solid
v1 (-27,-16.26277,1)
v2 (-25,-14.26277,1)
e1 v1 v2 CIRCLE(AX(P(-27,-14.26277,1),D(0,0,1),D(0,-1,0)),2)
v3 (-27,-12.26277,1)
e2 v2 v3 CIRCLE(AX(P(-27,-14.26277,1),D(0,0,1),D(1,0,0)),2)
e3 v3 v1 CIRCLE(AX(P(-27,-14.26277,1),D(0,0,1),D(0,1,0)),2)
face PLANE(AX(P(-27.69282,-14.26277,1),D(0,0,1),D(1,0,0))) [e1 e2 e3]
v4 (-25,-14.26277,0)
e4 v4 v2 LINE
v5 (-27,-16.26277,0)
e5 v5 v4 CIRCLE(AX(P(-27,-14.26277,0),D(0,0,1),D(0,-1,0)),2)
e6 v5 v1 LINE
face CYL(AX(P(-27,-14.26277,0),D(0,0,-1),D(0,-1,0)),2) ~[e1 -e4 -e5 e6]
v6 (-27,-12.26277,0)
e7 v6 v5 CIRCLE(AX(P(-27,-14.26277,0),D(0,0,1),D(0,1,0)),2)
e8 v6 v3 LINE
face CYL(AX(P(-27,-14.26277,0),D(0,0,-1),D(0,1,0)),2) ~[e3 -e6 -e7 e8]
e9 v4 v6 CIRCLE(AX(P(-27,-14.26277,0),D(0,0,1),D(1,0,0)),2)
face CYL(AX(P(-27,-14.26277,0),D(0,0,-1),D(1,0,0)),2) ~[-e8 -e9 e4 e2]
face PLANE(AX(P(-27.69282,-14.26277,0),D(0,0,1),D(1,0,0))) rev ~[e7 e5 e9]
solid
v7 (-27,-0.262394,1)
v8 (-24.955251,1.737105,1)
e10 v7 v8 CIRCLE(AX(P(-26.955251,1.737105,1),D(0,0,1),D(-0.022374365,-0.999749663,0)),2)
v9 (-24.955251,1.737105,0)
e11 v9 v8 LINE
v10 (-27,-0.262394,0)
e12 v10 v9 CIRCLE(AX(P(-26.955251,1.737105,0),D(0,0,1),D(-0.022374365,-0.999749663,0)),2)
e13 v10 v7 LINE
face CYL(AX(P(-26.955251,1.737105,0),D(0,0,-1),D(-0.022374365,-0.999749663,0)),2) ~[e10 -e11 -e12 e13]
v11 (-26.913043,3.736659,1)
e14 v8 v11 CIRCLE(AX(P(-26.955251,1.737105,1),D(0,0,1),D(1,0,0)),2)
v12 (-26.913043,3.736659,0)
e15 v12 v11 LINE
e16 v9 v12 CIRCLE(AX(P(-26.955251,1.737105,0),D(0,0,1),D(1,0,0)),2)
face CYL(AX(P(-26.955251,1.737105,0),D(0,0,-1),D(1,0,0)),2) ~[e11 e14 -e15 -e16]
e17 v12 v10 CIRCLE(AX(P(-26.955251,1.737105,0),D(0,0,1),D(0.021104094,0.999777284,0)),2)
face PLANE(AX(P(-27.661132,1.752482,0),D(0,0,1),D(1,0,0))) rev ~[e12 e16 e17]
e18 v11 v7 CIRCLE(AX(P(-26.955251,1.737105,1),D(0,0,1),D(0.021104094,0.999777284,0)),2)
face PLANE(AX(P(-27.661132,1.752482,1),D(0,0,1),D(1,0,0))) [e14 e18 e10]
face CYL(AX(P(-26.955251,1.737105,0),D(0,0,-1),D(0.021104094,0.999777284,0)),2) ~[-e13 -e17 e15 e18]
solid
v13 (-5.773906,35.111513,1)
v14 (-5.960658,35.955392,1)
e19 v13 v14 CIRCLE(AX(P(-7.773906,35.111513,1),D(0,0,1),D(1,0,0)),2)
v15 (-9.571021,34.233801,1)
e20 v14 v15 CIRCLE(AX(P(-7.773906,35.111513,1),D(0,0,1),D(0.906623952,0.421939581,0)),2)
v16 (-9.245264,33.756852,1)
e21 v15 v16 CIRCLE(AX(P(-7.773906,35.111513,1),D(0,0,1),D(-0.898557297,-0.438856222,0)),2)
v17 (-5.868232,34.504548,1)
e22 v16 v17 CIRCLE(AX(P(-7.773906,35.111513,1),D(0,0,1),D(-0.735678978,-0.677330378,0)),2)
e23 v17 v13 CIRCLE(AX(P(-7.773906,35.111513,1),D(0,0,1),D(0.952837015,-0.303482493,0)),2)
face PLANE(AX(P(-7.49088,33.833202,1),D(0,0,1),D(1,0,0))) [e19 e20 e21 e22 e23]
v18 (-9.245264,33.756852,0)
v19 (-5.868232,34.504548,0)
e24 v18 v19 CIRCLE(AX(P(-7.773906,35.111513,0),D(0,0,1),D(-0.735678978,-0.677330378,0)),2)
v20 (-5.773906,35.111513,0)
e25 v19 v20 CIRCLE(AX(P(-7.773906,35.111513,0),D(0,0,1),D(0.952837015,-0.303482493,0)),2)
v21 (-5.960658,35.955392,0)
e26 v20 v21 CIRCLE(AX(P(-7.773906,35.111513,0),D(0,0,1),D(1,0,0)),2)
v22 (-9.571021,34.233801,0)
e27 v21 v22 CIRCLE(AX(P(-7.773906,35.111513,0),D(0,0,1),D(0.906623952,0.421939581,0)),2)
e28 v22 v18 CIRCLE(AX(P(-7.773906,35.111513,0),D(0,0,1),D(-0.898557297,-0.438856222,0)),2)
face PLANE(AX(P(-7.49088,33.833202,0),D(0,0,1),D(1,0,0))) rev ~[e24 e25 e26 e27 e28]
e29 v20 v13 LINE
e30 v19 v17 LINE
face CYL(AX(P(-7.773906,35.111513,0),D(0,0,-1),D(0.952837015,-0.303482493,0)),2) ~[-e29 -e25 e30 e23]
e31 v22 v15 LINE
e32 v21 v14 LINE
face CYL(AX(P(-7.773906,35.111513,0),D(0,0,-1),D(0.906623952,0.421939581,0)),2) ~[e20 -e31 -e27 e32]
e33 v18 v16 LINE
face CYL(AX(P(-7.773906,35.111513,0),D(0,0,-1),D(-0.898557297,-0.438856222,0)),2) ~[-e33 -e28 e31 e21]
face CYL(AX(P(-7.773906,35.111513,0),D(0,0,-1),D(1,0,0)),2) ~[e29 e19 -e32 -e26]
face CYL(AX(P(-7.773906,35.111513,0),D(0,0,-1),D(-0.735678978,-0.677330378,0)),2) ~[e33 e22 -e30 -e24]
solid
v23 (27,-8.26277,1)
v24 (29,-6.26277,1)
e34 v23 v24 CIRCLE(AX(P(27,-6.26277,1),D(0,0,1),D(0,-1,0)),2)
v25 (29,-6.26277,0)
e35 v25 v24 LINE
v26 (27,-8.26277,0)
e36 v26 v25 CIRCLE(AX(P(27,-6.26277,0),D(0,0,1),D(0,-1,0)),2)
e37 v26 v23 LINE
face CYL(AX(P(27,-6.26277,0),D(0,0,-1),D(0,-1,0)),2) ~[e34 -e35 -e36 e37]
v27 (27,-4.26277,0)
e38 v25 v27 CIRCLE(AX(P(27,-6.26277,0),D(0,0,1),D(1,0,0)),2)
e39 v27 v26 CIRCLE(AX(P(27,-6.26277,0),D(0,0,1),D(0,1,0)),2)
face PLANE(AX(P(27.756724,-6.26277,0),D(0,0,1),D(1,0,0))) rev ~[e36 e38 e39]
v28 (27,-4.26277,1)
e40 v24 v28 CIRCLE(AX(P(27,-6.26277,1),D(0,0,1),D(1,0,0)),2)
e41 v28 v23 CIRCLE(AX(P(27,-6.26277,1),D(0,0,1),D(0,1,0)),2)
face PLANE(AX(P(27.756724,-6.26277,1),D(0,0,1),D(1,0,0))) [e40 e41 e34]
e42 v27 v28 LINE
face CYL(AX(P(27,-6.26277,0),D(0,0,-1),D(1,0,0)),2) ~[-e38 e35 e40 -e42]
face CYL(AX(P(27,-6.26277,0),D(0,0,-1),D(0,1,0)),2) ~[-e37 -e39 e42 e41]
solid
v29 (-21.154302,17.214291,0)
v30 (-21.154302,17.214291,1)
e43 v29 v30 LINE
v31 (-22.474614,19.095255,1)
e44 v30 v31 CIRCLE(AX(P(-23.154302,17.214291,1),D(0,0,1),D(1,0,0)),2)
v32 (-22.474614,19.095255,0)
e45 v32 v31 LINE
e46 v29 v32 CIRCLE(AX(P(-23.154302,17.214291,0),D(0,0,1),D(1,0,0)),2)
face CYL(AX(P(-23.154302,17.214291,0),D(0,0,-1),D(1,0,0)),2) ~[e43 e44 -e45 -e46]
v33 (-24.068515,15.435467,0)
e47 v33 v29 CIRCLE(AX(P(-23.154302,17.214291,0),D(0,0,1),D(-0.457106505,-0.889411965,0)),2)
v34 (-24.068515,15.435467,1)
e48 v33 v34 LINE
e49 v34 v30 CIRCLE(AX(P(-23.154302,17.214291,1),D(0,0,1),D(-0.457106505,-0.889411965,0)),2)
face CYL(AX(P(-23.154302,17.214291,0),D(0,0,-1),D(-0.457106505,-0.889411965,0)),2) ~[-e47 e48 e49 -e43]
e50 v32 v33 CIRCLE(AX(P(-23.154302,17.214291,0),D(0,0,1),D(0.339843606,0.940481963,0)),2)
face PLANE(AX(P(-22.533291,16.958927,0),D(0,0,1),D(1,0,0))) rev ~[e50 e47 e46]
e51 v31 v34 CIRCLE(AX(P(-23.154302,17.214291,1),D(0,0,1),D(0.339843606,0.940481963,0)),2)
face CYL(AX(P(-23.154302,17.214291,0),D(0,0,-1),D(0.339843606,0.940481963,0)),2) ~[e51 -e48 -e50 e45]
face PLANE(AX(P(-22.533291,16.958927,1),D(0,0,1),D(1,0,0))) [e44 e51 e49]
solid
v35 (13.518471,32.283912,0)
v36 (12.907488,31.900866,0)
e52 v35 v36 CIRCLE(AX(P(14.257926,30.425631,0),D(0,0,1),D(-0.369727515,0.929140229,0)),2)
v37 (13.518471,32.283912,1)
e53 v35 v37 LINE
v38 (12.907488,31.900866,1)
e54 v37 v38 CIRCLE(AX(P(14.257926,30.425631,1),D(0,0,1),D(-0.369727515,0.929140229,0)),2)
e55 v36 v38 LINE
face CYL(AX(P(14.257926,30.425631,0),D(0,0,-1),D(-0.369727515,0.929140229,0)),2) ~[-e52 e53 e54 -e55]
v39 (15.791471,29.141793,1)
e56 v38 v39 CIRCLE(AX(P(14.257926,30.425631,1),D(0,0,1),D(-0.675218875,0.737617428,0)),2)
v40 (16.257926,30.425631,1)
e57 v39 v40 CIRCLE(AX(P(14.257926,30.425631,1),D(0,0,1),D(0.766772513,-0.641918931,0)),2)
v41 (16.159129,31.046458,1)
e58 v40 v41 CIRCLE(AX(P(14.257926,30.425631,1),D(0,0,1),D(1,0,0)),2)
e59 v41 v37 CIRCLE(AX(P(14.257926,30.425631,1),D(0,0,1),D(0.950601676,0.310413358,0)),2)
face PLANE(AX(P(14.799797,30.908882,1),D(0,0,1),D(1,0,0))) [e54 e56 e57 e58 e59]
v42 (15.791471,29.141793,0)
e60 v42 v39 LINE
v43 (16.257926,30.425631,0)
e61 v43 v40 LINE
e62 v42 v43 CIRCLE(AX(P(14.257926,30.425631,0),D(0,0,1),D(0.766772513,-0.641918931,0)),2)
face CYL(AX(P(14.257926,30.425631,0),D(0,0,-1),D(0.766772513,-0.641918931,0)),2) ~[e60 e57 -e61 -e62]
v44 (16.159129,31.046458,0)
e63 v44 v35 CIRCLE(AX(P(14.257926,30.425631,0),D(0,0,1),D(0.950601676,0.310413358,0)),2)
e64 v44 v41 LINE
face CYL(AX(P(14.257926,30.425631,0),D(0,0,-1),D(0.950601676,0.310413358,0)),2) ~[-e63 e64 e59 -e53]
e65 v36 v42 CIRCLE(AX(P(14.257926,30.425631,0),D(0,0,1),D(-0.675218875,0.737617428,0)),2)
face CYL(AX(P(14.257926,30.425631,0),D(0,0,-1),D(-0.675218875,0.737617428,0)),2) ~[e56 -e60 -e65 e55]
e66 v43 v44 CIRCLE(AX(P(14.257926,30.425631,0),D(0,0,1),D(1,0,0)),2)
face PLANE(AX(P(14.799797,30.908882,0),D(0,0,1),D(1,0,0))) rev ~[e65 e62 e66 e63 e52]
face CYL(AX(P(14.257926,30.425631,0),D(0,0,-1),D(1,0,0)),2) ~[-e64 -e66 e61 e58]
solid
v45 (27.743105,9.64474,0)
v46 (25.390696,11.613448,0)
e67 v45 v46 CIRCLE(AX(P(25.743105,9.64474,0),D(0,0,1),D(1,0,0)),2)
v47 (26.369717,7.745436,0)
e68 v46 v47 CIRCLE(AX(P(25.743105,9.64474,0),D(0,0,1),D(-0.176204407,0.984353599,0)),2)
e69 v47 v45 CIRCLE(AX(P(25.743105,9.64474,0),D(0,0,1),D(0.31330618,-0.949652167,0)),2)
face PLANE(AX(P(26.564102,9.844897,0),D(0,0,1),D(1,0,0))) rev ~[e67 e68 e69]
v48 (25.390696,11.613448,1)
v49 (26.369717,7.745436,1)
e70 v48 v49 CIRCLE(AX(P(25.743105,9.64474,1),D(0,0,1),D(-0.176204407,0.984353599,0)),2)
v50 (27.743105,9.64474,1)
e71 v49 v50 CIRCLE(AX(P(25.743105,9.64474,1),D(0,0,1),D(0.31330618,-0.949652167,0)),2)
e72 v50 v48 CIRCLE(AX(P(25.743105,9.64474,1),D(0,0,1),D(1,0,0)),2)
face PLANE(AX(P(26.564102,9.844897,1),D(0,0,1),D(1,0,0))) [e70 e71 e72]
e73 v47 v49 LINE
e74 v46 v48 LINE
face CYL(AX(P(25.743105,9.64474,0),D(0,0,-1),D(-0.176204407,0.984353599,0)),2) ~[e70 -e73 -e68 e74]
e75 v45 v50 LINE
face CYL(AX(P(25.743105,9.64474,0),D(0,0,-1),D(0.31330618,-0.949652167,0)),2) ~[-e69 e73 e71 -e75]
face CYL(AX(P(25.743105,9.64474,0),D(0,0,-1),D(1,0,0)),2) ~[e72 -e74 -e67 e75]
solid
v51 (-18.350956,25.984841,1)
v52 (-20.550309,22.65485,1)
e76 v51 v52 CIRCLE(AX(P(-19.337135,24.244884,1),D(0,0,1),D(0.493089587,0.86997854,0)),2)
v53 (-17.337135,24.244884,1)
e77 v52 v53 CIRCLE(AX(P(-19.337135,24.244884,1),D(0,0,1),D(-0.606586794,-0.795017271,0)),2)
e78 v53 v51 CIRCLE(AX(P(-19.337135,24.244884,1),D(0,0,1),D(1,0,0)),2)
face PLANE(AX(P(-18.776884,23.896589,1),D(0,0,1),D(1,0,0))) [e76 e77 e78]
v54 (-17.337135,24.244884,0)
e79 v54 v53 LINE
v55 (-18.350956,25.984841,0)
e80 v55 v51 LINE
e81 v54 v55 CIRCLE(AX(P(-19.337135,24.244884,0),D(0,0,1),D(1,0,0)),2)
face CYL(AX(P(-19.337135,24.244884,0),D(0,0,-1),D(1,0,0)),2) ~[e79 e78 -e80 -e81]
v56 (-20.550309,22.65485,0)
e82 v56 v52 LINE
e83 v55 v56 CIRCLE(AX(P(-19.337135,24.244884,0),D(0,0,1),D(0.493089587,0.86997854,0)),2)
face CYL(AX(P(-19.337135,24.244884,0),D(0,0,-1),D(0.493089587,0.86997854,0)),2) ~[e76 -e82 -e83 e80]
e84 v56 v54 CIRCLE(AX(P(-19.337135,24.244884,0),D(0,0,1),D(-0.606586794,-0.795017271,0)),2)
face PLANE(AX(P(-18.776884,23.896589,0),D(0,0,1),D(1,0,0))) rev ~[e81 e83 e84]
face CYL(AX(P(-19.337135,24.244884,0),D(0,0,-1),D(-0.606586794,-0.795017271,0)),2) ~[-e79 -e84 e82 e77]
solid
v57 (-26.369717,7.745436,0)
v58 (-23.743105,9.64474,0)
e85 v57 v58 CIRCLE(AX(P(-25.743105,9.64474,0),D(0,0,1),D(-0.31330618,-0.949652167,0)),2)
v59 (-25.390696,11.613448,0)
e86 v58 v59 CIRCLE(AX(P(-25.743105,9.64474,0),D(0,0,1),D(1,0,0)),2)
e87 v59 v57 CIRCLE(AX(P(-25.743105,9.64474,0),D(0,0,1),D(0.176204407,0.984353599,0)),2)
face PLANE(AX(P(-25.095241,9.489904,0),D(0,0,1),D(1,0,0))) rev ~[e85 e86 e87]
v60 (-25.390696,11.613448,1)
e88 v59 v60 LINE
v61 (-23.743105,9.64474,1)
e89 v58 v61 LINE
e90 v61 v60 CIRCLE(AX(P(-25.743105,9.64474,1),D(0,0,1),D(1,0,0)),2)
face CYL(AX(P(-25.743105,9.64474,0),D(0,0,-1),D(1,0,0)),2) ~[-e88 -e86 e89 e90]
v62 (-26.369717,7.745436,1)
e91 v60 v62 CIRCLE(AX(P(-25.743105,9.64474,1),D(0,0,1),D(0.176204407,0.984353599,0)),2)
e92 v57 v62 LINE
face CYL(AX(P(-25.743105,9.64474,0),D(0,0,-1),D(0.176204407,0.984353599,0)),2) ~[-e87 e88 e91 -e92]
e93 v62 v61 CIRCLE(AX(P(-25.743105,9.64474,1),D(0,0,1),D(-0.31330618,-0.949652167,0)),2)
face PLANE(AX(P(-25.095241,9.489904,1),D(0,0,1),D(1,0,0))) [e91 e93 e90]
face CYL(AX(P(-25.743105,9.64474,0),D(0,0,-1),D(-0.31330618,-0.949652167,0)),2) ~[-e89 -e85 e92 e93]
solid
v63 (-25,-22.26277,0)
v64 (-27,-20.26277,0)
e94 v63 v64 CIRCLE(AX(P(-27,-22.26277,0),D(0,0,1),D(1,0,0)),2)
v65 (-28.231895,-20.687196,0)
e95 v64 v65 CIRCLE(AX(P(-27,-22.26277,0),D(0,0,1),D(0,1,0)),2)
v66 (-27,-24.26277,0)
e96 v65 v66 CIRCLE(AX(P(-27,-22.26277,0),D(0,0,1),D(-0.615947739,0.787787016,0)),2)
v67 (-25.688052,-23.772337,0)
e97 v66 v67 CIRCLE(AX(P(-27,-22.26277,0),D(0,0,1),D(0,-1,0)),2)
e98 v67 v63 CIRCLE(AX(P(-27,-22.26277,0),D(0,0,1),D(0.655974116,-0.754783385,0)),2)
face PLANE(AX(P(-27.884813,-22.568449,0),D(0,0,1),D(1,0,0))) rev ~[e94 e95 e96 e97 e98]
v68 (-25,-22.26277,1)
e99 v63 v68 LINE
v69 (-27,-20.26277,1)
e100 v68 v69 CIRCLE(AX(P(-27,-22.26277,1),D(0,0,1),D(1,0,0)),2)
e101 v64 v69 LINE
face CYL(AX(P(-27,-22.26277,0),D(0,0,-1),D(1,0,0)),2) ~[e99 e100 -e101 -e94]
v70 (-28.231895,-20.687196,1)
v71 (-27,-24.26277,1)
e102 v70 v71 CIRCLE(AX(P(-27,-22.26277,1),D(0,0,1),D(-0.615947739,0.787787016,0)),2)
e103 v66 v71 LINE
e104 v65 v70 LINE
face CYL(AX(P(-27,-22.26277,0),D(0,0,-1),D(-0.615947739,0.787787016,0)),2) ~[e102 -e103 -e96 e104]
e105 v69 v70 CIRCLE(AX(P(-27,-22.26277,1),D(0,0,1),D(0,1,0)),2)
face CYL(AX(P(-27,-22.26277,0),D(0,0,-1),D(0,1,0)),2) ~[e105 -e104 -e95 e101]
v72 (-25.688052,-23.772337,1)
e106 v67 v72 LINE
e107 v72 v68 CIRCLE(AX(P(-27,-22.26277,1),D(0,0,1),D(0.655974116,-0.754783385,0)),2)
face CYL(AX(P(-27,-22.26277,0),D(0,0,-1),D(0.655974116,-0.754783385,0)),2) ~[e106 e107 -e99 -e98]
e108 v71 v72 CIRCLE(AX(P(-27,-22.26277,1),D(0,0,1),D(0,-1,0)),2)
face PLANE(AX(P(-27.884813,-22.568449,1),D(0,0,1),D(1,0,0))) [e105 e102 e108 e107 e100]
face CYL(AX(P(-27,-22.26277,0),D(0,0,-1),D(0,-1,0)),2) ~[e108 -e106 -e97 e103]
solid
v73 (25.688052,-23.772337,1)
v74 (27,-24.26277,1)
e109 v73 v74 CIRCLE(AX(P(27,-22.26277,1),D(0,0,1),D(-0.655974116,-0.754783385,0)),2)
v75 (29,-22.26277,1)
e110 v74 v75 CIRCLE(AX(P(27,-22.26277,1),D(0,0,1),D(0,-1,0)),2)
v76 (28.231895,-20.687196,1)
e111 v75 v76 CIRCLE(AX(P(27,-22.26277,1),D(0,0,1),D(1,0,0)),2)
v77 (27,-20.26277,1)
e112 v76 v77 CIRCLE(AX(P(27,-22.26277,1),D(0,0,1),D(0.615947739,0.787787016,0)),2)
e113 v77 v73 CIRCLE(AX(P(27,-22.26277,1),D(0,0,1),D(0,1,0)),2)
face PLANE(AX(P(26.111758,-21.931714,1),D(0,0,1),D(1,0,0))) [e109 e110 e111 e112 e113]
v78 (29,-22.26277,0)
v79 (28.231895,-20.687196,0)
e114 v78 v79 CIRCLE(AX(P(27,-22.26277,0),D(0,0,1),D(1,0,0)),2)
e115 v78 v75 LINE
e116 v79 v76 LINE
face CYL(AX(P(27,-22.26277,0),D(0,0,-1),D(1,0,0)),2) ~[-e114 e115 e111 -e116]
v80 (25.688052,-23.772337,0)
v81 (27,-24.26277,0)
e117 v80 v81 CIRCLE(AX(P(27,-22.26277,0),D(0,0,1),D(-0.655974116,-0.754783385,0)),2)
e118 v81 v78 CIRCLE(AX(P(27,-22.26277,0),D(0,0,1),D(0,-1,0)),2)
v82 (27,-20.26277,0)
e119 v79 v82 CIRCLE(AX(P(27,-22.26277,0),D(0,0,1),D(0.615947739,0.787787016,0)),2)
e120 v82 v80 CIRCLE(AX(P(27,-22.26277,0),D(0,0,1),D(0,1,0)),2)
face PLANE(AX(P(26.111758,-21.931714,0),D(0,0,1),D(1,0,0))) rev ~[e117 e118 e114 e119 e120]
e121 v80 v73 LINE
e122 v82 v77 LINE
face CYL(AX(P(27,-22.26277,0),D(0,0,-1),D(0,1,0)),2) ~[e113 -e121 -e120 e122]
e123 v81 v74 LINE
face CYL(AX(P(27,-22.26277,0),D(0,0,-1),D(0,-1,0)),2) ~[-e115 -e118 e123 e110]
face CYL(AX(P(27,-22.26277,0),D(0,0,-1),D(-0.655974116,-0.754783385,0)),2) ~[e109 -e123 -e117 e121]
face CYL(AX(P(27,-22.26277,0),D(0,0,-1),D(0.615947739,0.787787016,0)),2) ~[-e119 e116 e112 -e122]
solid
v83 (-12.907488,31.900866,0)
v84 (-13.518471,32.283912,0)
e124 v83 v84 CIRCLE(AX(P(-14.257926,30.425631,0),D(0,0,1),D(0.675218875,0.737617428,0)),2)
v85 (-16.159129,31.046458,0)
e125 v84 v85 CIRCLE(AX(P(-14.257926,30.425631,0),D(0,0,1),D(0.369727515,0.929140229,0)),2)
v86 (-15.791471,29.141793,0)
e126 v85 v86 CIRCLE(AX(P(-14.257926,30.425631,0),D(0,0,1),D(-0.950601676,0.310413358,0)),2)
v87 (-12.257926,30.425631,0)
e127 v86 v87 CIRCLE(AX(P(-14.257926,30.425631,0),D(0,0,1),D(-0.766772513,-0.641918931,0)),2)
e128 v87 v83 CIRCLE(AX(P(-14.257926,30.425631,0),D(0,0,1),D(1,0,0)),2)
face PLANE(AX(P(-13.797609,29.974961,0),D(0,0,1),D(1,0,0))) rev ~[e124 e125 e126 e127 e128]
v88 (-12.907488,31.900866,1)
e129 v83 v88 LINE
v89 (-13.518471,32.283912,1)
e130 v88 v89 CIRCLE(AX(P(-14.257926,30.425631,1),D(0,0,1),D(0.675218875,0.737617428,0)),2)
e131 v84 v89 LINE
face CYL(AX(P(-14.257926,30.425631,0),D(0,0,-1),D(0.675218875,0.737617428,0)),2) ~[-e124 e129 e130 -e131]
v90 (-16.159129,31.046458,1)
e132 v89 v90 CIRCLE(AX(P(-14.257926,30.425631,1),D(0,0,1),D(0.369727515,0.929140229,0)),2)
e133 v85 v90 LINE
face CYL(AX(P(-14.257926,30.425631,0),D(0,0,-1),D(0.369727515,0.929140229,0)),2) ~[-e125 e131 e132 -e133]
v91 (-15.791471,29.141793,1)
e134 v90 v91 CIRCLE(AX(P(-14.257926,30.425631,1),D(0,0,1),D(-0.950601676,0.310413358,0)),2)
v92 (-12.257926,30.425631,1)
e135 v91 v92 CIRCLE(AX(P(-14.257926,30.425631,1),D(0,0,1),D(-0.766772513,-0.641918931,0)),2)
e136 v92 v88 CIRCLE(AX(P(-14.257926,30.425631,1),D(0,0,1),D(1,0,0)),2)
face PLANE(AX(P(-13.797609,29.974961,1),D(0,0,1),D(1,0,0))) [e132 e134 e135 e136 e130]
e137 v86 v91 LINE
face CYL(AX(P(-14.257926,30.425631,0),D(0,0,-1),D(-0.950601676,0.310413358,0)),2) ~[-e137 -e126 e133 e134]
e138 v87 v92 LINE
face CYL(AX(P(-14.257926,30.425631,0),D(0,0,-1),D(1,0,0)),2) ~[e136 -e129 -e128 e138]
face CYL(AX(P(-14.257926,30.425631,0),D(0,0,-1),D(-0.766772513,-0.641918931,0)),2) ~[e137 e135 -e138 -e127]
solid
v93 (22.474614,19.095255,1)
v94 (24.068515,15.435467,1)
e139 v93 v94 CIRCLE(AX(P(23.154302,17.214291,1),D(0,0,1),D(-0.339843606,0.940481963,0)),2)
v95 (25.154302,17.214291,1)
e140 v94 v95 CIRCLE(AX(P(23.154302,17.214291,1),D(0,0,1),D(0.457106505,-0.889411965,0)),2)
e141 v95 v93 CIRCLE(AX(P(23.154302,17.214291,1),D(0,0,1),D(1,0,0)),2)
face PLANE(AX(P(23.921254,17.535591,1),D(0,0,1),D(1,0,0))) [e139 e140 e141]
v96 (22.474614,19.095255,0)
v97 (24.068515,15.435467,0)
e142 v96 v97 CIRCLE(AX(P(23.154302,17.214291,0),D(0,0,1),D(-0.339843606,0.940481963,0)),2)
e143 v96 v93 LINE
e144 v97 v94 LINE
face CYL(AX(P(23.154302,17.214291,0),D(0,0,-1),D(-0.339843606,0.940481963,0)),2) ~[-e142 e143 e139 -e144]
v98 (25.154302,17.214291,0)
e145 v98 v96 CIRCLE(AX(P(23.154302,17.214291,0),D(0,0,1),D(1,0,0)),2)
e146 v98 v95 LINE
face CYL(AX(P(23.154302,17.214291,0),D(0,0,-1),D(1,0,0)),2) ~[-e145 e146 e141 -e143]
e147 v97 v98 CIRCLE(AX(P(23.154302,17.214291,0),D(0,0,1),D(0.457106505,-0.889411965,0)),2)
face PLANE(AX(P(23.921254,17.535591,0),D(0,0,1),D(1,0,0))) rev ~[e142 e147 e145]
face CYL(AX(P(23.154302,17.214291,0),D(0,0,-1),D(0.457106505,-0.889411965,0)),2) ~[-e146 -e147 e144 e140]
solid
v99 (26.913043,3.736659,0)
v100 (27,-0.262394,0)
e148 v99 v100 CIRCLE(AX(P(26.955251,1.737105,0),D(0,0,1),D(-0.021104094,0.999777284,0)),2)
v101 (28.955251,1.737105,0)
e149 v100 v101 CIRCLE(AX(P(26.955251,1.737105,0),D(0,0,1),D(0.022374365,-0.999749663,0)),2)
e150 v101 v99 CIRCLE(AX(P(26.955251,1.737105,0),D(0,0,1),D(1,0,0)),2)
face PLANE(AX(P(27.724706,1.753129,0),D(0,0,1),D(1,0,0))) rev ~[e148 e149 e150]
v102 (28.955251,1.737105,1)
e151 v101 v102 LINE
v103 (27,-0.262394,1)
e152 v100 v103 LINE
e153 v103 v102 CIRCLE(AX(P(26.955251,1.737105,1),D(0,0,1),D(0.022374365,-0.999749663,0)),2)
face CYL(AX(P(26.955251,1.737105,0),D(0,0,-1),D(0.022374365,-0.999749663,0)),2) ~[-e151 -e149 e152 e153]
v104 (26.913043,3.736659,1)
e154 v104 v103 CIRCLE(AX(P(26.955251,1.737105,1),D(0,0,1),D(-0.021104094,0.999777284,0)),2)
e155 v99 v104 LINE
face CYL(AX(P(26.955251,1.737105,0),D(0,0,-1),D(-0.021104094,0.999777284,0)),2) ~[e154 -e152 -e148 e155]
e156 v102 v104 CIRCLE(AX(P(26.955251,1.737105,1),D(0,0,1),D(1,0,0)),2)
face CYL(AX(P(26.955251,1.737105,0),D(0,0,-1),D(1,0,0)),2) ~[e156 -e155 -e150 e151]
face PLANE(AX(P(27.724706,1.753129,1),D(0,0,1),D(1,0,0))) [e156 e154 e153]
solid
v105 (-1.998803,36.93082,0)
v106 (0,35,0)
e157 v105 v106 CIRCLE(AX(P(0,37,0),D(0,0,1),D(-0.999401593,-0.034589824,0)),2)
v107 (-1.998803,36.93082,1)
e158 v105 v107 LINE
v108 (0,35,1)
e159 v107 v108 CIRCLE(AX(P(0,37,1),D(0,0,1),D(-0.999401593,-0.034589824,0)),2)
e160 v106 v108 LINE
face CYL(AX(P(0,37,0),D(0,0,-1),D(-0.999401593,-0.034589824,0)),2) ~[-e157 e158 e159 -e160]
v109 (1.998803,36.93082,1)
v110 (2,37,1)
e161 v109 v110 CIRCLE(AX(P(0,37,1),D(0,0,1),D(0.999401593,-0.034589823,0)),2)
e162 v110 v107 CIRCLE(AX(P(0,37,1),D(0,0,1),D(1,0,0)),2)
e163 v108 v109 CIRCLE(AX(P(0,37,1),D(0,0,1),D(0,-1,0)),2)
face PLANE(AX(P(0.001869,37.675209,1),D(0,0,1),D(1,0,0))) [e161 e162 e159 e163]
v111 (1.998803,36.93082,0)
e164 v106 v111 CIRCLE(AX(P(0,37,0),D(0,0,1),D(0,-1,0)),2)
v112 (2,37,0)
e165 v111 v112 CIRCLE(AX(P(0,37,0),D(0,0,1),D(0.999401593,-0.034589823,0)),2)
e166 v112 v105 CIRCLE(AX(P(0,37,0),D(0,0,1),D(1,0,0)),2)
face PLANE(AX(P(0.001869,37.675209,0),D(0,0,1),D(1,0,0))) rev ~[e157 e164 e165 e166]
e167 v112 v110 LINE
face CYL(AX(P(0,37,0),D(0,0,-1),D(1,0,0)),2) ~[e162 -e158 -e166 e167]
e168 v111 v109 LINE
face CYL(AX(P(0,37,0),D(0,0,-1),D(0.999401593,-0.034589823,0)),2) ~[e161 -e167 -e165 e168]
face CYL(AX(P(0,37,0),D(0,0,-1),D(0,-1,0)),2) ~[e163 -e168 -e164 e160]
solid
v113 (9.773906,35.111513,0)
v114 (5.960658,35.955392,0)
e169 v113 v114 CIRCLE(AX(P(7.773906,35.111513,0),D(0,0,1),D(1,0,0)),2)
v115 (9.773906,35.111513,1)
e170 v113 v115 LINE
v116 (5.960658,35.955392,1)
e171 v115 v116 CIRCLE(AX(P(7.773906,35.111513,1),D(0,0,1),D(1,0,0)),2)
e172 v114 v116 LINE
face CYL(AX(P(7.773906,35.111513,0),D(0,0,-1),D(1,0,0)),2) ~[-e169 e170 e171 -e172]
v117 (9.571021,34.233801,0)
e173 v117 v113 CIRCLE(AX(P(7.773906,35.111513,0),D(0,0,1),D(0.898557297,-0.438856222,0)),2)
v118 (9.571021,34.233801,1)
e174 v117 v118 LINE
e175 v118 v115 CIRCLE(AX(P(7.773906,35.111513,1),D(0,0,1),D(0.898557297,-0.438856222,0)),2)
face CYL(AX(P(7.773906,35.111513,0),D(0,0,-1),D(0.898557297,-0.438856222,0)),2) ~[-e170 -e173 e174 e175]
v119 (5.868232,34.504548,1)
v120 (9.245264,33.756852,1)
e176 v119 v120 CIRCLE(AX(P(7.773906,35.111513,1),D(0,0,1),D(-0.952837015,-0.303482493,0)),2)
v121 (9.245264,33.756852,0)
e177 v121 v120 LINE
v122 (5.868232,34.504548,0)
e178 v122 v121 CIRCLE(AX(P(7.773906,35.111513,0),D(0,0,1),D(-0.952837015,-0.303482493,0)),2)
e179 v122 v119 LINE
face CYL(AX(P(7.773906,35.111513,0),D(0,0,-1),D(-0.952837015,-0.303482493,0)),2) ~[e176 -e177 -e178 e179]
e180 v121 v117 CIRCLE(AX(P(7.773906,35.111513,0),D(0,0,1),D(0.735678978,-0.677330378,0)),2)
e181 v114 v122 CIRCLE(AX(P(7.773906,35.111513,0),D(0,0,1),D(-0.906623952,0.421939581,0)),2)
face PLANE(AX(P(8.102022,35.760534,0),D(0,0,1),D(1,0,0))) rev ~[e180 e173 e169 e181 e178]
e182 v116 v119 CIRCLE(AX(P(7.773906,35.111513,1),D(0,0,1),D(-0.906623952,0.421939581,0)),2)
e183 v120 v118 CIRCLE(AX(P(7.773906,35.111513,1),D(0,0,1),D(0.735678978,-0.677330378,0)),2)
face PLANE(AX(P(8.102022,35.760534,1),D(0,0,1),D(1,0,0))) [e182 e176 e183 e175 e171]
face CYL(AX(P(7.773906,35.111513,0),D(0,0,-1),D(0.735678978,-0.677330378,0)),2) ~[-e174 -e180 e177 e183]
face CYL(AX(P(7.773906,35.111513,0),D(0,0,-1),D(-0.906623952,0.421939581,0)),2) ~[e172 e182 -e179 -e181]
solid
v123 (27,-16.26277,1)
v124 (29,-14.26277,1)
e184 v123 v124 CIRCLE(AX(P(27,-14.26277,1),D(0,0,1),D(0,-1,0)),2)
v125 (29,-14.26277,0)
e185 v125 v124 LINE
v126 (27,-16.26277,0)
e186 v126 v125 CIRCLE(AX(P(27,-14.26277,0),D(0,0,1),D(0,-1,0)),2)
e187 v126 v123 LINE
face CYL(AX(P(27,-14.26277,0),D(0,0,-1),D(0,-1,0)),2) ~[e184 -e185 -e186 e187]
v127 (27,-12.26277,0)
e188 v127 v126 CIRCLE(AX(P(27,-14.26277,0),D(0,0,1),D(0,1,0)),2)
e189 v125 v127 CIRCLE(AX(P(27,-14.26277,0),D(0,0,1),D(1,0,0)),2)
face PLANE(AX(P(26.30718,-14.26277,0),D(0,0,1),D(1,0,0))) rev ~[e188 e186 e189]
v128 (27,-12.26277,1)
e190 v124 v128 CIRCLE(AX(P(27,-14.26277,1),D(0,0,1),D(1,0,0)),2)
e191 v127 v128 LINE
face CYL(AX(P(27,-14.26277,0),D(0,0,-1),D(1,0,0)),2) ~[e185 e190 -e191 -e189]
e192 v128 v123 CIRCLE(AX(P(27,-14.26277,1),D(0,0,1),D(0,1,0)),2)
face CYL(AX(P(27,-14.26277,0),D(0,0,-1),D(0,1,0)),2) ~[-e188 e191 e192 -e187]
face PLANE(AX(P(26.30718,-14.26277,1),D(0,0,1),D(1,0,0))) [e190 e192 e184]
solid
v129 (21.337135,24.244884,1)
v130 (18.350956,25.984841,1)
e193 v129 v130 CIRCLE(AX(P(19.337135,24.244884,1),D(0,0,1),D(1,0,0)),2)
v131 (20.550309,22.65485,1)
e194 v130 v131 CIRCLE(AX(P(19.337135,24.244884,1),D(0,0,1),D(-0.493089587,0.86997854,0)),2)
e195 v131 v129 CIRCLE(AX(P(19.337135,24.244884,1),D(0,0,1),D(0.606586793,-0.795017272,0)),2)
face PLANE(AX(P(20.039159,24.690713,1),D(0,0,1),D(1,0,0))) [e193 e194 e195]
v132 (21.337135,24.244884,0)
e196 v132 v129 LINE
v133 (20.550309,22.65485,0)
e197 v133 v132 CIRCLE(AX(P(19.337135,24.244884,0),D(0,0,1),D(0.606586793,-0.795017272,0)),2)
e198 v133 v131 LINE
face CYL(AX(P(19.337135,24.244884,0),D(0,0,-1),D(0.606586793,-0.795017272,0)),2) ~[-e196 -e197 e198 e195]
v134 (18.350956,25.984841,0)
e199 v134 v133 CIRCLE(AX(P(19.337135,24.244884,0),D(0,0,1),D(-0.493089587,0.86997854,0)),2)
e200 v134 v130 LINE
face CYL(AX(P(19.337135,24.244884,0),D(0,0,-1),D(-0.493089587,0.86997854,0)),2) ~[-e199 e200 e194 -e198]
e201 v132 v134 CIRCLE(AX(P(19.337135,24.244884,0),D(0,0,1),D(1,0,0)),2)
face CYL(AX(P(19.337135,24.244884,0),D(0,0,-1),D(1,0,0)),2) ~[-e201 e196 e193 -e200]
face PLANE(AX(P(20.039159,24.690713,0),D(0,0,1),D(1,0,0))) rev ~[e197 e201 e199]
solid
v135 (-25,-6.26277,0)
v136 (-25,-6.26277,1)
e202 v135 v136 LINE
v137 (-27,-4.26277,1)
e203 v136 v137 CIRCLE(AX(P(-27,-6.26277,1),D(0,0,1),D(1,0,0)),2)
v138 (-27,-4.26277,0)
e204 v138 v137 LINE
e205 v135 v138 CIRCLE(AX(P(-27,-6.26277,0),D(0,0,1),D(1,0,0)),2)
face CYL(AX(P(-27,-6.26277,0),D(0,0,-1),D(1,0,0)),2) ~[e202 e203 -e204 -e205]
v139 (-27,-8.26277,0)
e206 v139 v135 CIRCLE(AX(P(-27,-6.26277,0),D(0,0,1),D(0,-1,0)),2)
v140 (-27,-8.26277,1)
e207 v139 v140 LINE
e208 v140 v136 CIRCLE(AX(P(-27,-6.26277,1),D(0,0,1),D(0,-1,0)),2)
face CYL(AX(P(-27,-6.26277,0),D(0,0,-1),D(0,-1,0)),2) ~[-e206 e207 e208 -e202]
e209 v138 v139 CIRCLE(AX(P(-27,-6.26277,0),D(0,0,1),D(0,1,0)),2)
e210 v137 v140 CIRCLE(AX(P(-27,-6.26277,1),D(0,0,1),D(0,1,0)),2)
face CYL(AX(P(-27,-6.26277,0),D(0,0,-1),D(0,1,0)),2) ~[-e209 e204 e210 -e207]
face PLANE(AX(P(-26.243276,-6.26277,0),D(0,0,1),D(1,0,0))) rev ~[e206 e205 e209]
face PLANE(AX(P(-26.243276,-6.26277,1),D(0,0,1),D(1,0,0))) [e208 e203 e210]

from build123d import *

# Parameters (mm, degrees)
F1_DEPTH = 1


with BuildPart() as f1:
    # F0 (on Top) → F1 (new body)
    with BuildSketch(Plane.XY):
        with BuildLine():
            ThreePointArc((-27, -22.2710574513), (-27.6273003349, -21.4879565386), (-28.2318954775, -20.6871959856))
            ThreePointArc((-28.2318954775, -20.6871959856), (-28.8909188329, -22.914249847), (-27, -24.2627700182))
            Line((-27, -24.2627700182), (-27, -22.2710574513))
        make_face()
        with BuildLine():
            ThreePointArc((-27, -24.2627700182), (-26.2996906188, -24.1361537938), (-25.6880517673, -23.7723367888))
            ThreePointArc((-25.6880517673, -23.7723367888), (-26.3547179775, -23.0310407999), (-27, -22.2710574513))
            Line((-27, -22.2710574513), (-27, -24.2627700182))
        make_face()
        with BuildLine():
            ThreePointArc((-27, -22.2710574513), (-26.3547179775, -23.0310407999), (-25.6880517673, -23.7723367888))
            ThreePointArc((-25.6880517673, -23.7723367888), (-25.1801241161, -23.0922588773), (-25, -22.2627700182))
            ThreePointArc((-25, -22.2627700182), (-25.5857864376, -20.8485564558), (-27, -20.2627700182))
            Line((-27, -20.2627700182), (-27, -22.2710574513))
        make_face()
        with BuildLine():
            ThreePointArc((-27, -20.2627700182), (-27.6514798288, -20.3718511853), (-28.2318954775, -20.6871959856))
            ThreePointArc((-28.2318954775, -20.6871959856), (-27.6273003349, -21.4879565386), (-27, -22.2710574513))
            Line((-27, -22.2710574513), (-27, -20.2627700182))
        make_face()
    extrude(amount=F1_DEPTH)


with BuildPart() as f1b:
    # F0 (on Top) → F1, piece 2 (new body)
    with BuildSketch(Plane.XY):
        with BuildLine():
            ThreePointArc((-27, -12.2627700182), (-29, -14.2627700182), (-27, -16.2627700182))
            Line((-27, -16.2627700182), (-27, -12.2627700182))
        make_face()
        with BuildLine():
            Line((-27, -12.2627700182), (-27, -16.2627700182))
            ThreePointArc((-27, -16.2627700182), (-25.5857864376, -15.6769835806), (-25, -14.2627700182))
            ThreePointArc((-25, -14.2627700182), (-25.5857864376, -12.8485564558), (-27, -12.2627700182))
        make_face()
    extrude(amount=F1_DEPTH)


with BuildPart() as f1c:
    # F0 (on Top) → F1, piece 3 (new body)
    with BuildSketch(Plane.XY):
        with BuildLine():
            Line((-27, -4.2627700182), (-27, -8.2627700182))
            ThreePointArc((-27, -8.2627700182), (-25.5857864376, -7.6769835806), (-25, -6.2627700182))
            ThreePointArc((-25, -6.2627700182), (-25.5857864376, -4.8485564558), (-27, -4.2627700182))
        make_face()
        with BuildLine():
            ThreePointArc((-27, -4.2627700182), (-29, -6.2627700182), (-27, -8.2627700182))
            Line((-27, -8.2627700182), (-27, -4.2627700182))
        make_face()
    extrude(amount=F1_DEPTH)


with BuildPart() as f1d:
    # F0 (on Top) → F1, piece 4 (new body)
    with BuildSketch(Plane.XY):
        with BuildLine():
            ThreePointArc((-26.9130430815, 3.7366593954), (-28.9547786194, 1.7805832958), (-27, -0.2623944974))
            Line((-27, -0.2623944974), (-27, 2.1762e-06))
            add(Edge.make_bspline(
                [(-26.9130430815, 3.7366593954), (-26.9557223388, 3.1632457962), (-27.0178727185, 1.9174252072), (-27.018694794, 0.6711028041), (-27, 2.1762e-06)],
                knots=[46.3026951197, 46.3026951197, 46.3026951197, 46.3026951197, 48.0262708445, 50.0404462243, 50.0404462243, 50.0404462243, 50.0404462243], degree=3))
        make_face()
        with BuildLine():
            Line((-27, 2.1762e-06), (-27, -0.2623944974))
            ThreePointArc((-27, -0.2623944974), (-25.5569482732, 0.3071577202), (-24.9552512695, 1.7371048277))
            ThreePointArc((-24.9552512695, 1.7371048277), (-25.5261927725, 3.1363159669), (-26.9130430815, 3.7366593954))
            add(Edge.make_bspline(
                [(-26.9130430815, 3.7366593954), (-26.9557223388, 3.1632457962), (-27.0178727185, 1.9174252072), (-27.018694794, 0.6711028041), (-27, 2.1762e-06)],
                knots=[46.3026951197, 46.3026951197, 46.3026951197, 46.3026951197, 48.0262708445, 50.0404462243, 50.0404462243, 50.0404462243, 50.0404462243], degree=3))
        make_face()
    extrude(amount=F1_DEPTH)


with BuildPart() as f1e:
    # F0 (on Top) → F1, piece 5 (new body)
    with BuildSketch(Plane.XY):
        with BuildLine():
            ThreePointArc((-23.7431047524, 9.6447404302), (-24.2093483136, 10.9283257161), (-25.3906959388, 11.6134476273))
            add(Edge.make_bspline(
                [(-25.3906959388, 11.6134476273), (-25.7772926058, 10.3391469136), (-26.1108947944, 9.0492772718), (-26.3697171129, 7.7454360971)],
                knots=[38.2700182558, 38.2700182558, 38.2700182558, 38.2700182558, 42.2565390205, 42.2565390205, 42.2565390205, 42.2565390205], degree=3))
            ThreePointArc((-26.3697171129, 7.7454360971), (-24.571188527, 8.0240577467), (-23.7431047524, 9.6447404302))
        make_face()
        with BuildLine():
            add(Edge.make_bspline(
                [(-25.3906959388, 11.6134476273), (-25.7772926058, 10.3391469136), (-26.1108947944, 9.0492772718), (-26.3697171129, 7.7454360971)],
                knots=[38.2700182558, 38.2700182558, 38.2700182558, 38.2700182558, 42.2565390205, 42.2565390205, 42.2565390205, 42.2565390205], degree=3))
            ThreePointArc((-25.3906959388, 11.6134476273), (-27.6819640036, 10.135479469), (-26.3697171129, 7.7454360971))
        make_face()
    extrude(amount=F1_DEPTH)


with BuildPart() as f1f:
    # F0 (on Top) → F1, piece 6 (new body)
    with BuildSketch(Plane.XY):
        with BuildLine():
            ThreePointArc((-21.1543015859, 17.2142911543), (-21.5173265672, 18.3633397991), (-22.4746143741, 19.0952550811))
            add(Edge.make_bspline(
                [(-22.4746143741, 19.0952550811), (-23.0556600273, 17.8981688231), (-23.5857836353, 16.6765500861), (-24.0685145965, 15.4354672251)],
                knots=[30.2406883205, 30.2406883205, 30.2406883205, 30.2406883205, 34.2317341084, 34.2317341084, 34.2317341084, 34.2317341084], degree=3))
            ThreePointArc((-24.0685145965, 15.4354672251), (-22.1122905546, 15.5071845347), (-21.1543015859, 17.2142911543))
        make_face()
        with BuildLine():
            add(Edge.make_bspline(
                [(-22.4746143741, 19.0952550811), (-23.0556600273, 17.8981688231), (-23.5857836353, 16.6765500861), (-24.0685145965, 15.4354672251)],
                knots=[30.2406883205, 30.2406883205, 30.2406883205, 30.2406883205, 34.2317341084, 34.2317341084, 34.2317341084, 34.2317341084], degree=3))
            ThreePointArc((-22.4746143741, 19.0952550811), (-24.9879488735, 18.0128759178), (-24.0685145965, 15.4354672251))
        make_face()
    extrude(amount=F1_DEPTH)


with BuildPart() as f1g:
    # F0 (on Top) → F1, piece 7 (new body)
    with BuildSketch(Plane.XY):
        with BuildLine():
            ThreePointArc((-17.3371352018, 24.244884358), (-17.609078729, 25.2517710581), (-18.3509560286, 25.9848414374))
            add(Edge.make_bspline(
                [(-18.3509560286, 25.9848414374), (-18.4580562206, 25.8374406972), (-19.2338042958, 24.7553116944), (-19.9604613575, 23.6396881807), (-20.5503087889, 22.6548498151)],
                knots=[22.2089072466, 22.2089072466, 22.2089072466, 22.2089072466, 22.7543847852, 26.1951280926, 26.1951280926, 26.1951280926, 26.1951280926], degree=3))
            ThreePointArc((-20.5503087889, 22.6548498151), (-18.4501028389, 22.4523516283), (-17.3371352018, 24.244884358))
        make_face()
        with BuildLine():
            add(Edge.make_bspline(
                [(-18.3509560286, 25.9848414374), (-18.4580562206, 25.8374406972), (-19.2338042958, 24.7553116944), (-19.9604613575, 23.6396881807), (-20.5503087889, 22.6548498151)],
                knots=[22.2089072466, 22.2089072466, 22.2089072466, 22.2089072466, 22.7543847852, 26.1951280926, 26.1951280926, 26.1951280926, 26.1951280926], degree=3))
            ThreePointArc((-18.3509560286, 25.9848414374), (-21.0059948925, 25.3471127068), (-20.5503087889, 22.6548498151))
        make_face()
    extrude(amount=F1_DEPTH)


with BuildPart() as f1h:
    # F0 (on Top) → F1, piece 8 (new body)
    with BuildSketch(Plane.XY):
        with BuildLine():
            add(Edge.make_bspline(
                [(-12.9074879803, 31.9008660262), (-13.4295174599, 31.4690091957), (-14.4233333877, 30.5803022949), (-15.3506230563, 29.6249489161), (-15.7914707556, 29.1417933074)],
                knots=[14.160331002, 14.160331002, 14.160331002, 14.160331002, 16.189226149, 18.1494166154, 18.1494166154, 18.1494166154, 18.1494166154], degree=3))
            ThreePointArc((-15.7914707556, 29.1417933074), (-13.5749506396, 28.5458585701), (-12.2579257305, 30.4256311694))
            ThreePointArc((-12.2579257305, 30.4256311694), (-12.4275056284, 31.2315854174), (-12.9074879803, 31.9008660262))
        make_face()
        with BuildLine():
            ThreePointArc((-13.5184707003, 32.2839116268), (-14.85169368, 31.6926993933), (-16.1591290831, 31.0464578861))
            ThreePointArc((-16.1591290831, 31.0464578861), (-16.2216749237, 30.0465677102), (-15.7914707556, 29.1417933074))
            add(Edge.make_bspline(
                [(-12.9074879803, 31.9008660262), (-13.4295174599, 31.4690091957), (-14.4233333877, 30.5803022949), (-15.3506230563, 29.6249489161), (-15.7914707556, 29.1417933074)],
                knots=[14.160331002, 14.160331002, 14.160331002, 14.160331002, 16.189226149, 18.1494166154, 18.1494166154, 18.1494166154, 18.1494166154], degree=3))
            ThreePointArc((-12.9074879803, 31.9008660262), (-13.1955727094, 32.1201535383), (-13.5184707003, 32.2839116268))
        make_face()
        with BuildLine():
            ThreePointArc((-13.5184707003, 32.2839116268), (-15.1065939408, 32.2366425633), (-16.1591290831, 31.0464578861))
            ThreePointArc((-16.1591290831, 31.0464578861), (-14.85169368, 31.6926993933), (-13.5184707003, 32.2839116268))
        make_face()
    extrude(amount=F1_DEPTH)


with BuildPart() as f1i:
    # F0 (on Top) → F1, piece 9 (new body)
    with BuildSketch(Plane.XY):
        with BuildLine():
            ThreePointArc((-5.8682321833, 34.504548266), (-7.565990037, 34.1724420368), (-9.2452641692, 33.7568524961))
            ThreePointArc((-9.2452641692, 33.7568524961), (-7.3415639248, 33.1588022784), (-5.8682321833, 34.504548266))
        make_face()
        with BuildLine():
            ThreePointArc((-9.5710208071, 34.233800808), (-9.4254503771, 33.9835053297), (-9.2452641692, 33.7568524961))
            ThreePointArc((-9.2452641692, 33.7568524961), (-7.565990037, 34.1724420368), (-5.8682321833, 34.504548266))
            ThreePointArc((-5.8682321833, 34.504548266), (-5.7976283907, 34.8043879181), (-5.7739062126, 35.111513252))
            ThreePointArc((-5.7739062126, 35.111513252), (-5.8211522845, 35.543661486), (-5.9606583088, 35.9553924134))
            add(Edge.make_bspline(
                [(-5.9606583088, 35.9553924134), (-6.4328058861, 35.777718689), (-7.6644782169, 35.2625574752), (-8.8531185259, 34.6509988525), (-9.5710208071, 34.233800808)],
                knots=[6.0884535184, 6.0884535184, 6.0884535184, 6.0884535184, 7.6012051941, 10.089797983, 10.089797983, 10.089797983, 10.089797983], degree=3))
        make_face()
        with BuildLine():
            ThreePointArc((-5.9606583088, 35.9553924134), (-8.6347398115, 36.9167737636), (-9.5710208071, 34.233800808))
            add(Edge.make_bspline(
                [(-5.9606583088, 35.9553924134), (-6.4328058861, 35.777718689), (-7.6644782169, 35.2625574752), (-8.8531185259, 34.6509988525), (-9.5710208071, 34.233800808)],
                knots=[6.0884535184, 6.0884535184, 6.0884535184, 6.0884535184, 7.6012051941, 10.089797983, 10.089797983, 10.089797983, 10.089797983], degree=3))
        make_face()
    extrude(amount=F1_DEPTH)


with BuildPart() as f1j:
    # F0 (on Top) → F1, piece 10 (new body)
    with BuildSketch(Plane.XY):
        with BuildLine():
            ThreePointArc((2, 37), (-0.0345949994, 38.9997007741), (-1.998803186, 36.9308203529))
            add(Edge.make_bspline(
                [(0, 37), (-0.2833414452, 37.0069688983), (-0.9504816494, 37.0068654793), (-1.6172669927, 36.9687119393), (-1.998803186, 36.9308203529)],
                knots=[0, 0, 0, 0, 0.8506820357, 2.0004209479, 2.0004209479, 2.0004209479, 2.0004209479], degree=3))
            add(Edge.make_bspline(
                [(0, 37), (0.2833414452, 37.0069688983), (0.9504816494, 37.0068654793), (1.6172669927, 36.9687119393), (1.998803186, 36.9308203529)],
                knots=[0, 0, 0, 0, 0.8506820357, 2.0004209479, 2.0004209479, 2.0004209479, 2.0004209479], degree=3))
            ThreePointArc((1.998803186, 36.9308203529), (1.9997007741, 36.9654050006), (2, 37))
        make_face()
        with BuildLine():
            ThreePointArc((-1.998803186, 36.9308203529), (-1.389539619, 35.5615356636), (0, 35))
            ThreePointArc((0, 35), (1.389539619, 35.5615356636), (1.998803186, 36.9308203529))
            add(Edge.make_bspline(
                [(0, 37), (0.2833414452, 37.0069688983), (0.9504816494, 37.0068654793), (1.6172669927, 36.9687119393), (1.998803186, 36.9308203529)],
                knots=[0, 0, 0, 0, 0.8506820357, 2.0004209479, 2.0004209479, 2.0004209479, 2.0004209479], degree=3))
            add(Edge.make_bspline(
                [(0, 37), (-0.2833414452, 37.0069688983), (-0.9504816494, 37.0068654793), (-1.6172669927, 36.9687119393), (-1.998803186, 36.9308203529)],
                knots=[0, 0, 0, 0, 0.8506820357, 2.0004209479, 2.0004209479, 2.0004209479, 2.0004209479], degree=3))
        make_face()
    extrude(amount=F1_DEPTH)


with BuildPart() as f1k:
    # F0 (on Top) → F1, piece 11 (new body)
    with BuildSketch(Plane.XY):
        with BuildLine():
            add(Edge.make_bspline(
                [(5.9606583088, 35.9553924134), (6.4328058861, 35.777718689), (7.6644782169, 35.2625574752), (8.8531185259, 34.6509988525), (9.5710208071, 34.233800808)],
                knots=[6.0884535184, 6.0884535184, 6.0884535184, 6.0884535184, 7.6012051941, 10.089797983, 10.089797983, 10.089797983, 10.089797983], degree=3))
            ThreePointArc((9.5710208071, 34.233800808), (9.7225248501, 34.6610852271), (9.7739062126, 35.111513252))
            ThreePointArc((9.7739062126, 35.111513252), (8.2060544466, 37.0642671801), (5.9606583088, 35.9553924134))
        make_face()
        with BuildLine():
            ThreePointArc((5.8682321833, 34.504548266), (7.565990037, 34.1724420368), (9.2452641692, 33.7568524961))
            ThreePointArc((9.2452641692, 33.7568524961), (9.4254503771, 33.9835053297), (9.5710208071, 34.233800808))
            add(Edge.make_bspline(
                [(5.9606583088, 35.9553924134), (6.4328058861, 35.777718689), (7.6644782169, 35.2625574752), (8.8531185259, 34.6509988525), (9.5710208071, 34.233800808)],
                knots=[6.0884535184, 6.0884535184, 6.0884535184, 6.0884535184, 7.6012051941, 10.089797983, 10.089797983, 10.089797983, 10.089797983], degree=3))
            ThreePointArc((5.9606583088, 35.9553924134), (5.7779522374, 35.2386656362), (5.8682321833, 34.504548266))
        make_face()
        with BuildLine():
            ThreePointArc((5.8682321833, 34.504548266), (7.3415639248, 33.1588022784), (9.2452641692, 33.7568524961))
            ThreePointArc((9.2452641692, 33.7568524961), (7.565990037, 34.1724420368), (5.8682321833, 34.504548266))
        make_face()
    extrude(amount=F1_DEPTH)


with BuildPart() as f1l:
    # F0 (on Top) → F1, piece 12 (new body)
    with BuildSketch(Plane.XY):
        with BuildLine():
            ThreePointArc((16.2579257305, 30.4256311694), (16.2330721435, 30.7399505093), (16.1591290831, 31.0464578861))
            ThreePointArc((16.1591290831, 31.0464578861), (14.85169368, 31.6926993933), (13.5184707003, 32.2839116268))
            ThreePointArc((13.5184707003, 32.2839116268), (13.1955727094, 32.1201535383), (12.9074879803, 31.9008660262))
            add(Edge.make_bspline(
                [(12.9074879803, 31.9008660262), (13.4295174599, 31.4690091957), (14.4233333877, 30.5803022949), (15.3506230563, 29.6249489161), (15.7914707556, 29.1417933074)],
                knots=[14.160331002, 14.160331002, 14.160331002, 14.160331002, 16.189226149, 18.1494166154, 18.1494166154, 18.1494166154, 18.1494166154], degree=3))
            ThreePointArc((15.7914707556, 29.1417933074), (16.1376983298, 29.7426560785), (16.2579257305, 30.4256311694))
        make_face()
        with BuildLine():
            add(Edge.make_bspline(
                [(12.9074879803, 31.9008660262), (13.4295174599, 31.4690091957), (14.4233333877, 30.5803022949), (15.3506230563, 29.6249489161), (15.7914707556, 29.1417933074)],
                knots=[14.160331002, 14.160331002, 14.160331002, 14.160331002, 16.189226149, 18.1494166154, 18.1494166154, 18.1494166154, 18.1494166154], degree=3))
            ThreePointArc((12.9074879803, 31.9008660262), (12.8753547069, 28.9804677307), (15.7914707556, 29.1417933074))
        make_face()
        with BuildLine():
            ThreePointArc((13.5184707003, 32.2839116268), (14.85169368, 31.6926993933), (16.1591290831, 31.0464578861))
            ThreePointArc((16.1591290831, 31.0464578861), (15.1065939408, 32.2366425633), (13.5184707003, 32.2839116268))
        make_face()
    extrude(amount=F1_DEPTH)


with BuildPart() as f1m:
    # F0 (on Top) → F1, piece 13 (new body)
    with BuildSketch(Plane.XY):
        with BuildLine():
            ThreePointArc((21.3371352018, 24.244884358), (20.3440219019, 25.9729408309), (18.3509560286, 25.9848414374))
            add(Edge.make_bspline(
                [(18.3509560286, 25.9848414374), (18.4580562206, 25.8374406972), (19.2338042958, 24.7553116944), (19.9604613575, 23.6396881807), (20.5503087889, 22.6548498151)],
                knots=[22.2089072466, 22.2089072466, 22.2089072466, 22.2089072466, 22.7543847852, 26.1951280926, 26.1951280926, 26.1951280926, 26.1951280926], degree=3))
            ThreePointArc((20.5503087889, 22.6548498151), (21.1296679316, 23.3578519951), (21.3371352018, 24.244884358))
        make_face()
        with BuildLine():
            add(Edge.make_bspline(
                [(18.3509560286, 25.9848414374), (18.4580562206, 25.8374406972), (19.2338042958, 24.7553116944), (19.9604613575, 23.6396881807), (20.5503087889, 22.6548498151)],
                knots=[22.2089072466, 22.2089072466, 22.2089072466, 22.2089072466, 22.7543847852, 26.1951280926, 26.1951280926, 26.1951280926, 26.1951280926], degree=3))
            ThreePointArc((18.3509560286, 25.9848414374), (17.6682755112, 23.1426560093), (20.5503087889, 22.6548498151))
        make_face()
    extrude(amount=F1_DEPTH)


with BuildPart() as f1n:
    # F0 (on Top) → F1, piece 14 (new body)
    with BuildSketch(Plane.XY):
        with BuildLine():
            ThreePointArc((25.1543015859, 17.2142911543), (24.3033502307, 18.851266173), (22.4746143741, 19.0952550811))
            add(Edge.make_bspline(
                [(22.4746143741, 19.0952550811), (23.0556600273, 17.8981688231), (23.5857836353, 16.6765500861), (24.0685145965, 15.4354672251)],
                knots=[30.2406883205, 30.2406883205, 30.2406883205, 30.2406883205, 34.2317341084, 34.2317341084, 34.2317341084, 34.2317341084], degree=3))
            ThreePointArc((24.0685145965, 15.4354672251), (24.8614082055, 16.172280123), (25.1543015859, 17.2142911543))
        make_face()
        with BuildLine():
            add(Edge.make_bspline(
                [(22.4746143741, 19.0952550811), (23.0556600273, 17.8981688231), (23.5857836353, 16.6765500861), (24.0685145965, 15.4354672251)],
                knots=[30.2406883205, 30.2406883205, 30.2406883205, 30.2406883205, 34.2317341084, 34.2317341084, 34.2317341084, 34.2317341084], degree=3))
            ThreePointArc((22.4746143741, 19.0952550811), (21.3206542983, 16.4157063908), (24.0685145965, 15.4354672251))
        make_face()
    extrude(amount=F1_DEPTH)


with BuildPart() as f1o:
    # F0 (on Top) → F1, piece 15 (new body)
    with BuildSketch(Plane.XY):
        with BuildLine():
            add(Edge.make_bspline(
                [(25.3906959388, 11.6134476273), (25.7772926058, 10.3391469136), (26.1108947944, 9.0492772718), (26.3697171129, 7.7454360971)],
                knots=[38.2700182558, 38.2700182558, 38.2700182558, 38.2700182558, 42.2565390205, 42.2565390205, 42.2565390205, 42.2565390205], degree=3))
            ThreePointArc((26.3697171129, 7.7454360971), (27.3637874359, 8.4728242047), (27.7431047524, 9.6447404302))
            ThreePointArc((27.7431047524, 9.6447404302), (27.0266900384, 11.178496869), (25.3906959388, 11.6134476273))
        make_face()
        with BuildLine():
            ThreePointArc((25.3906959388, 11.6134476273), (23.8042455013, 9.1540013914), (26.3697171129, 7.7454360971))
            add(Edge.make_bspline(
                [(25.3906959388, 11.6134476273), (25.7772926058, 10.3391469136), (26.1108947944, 9.0492772718), (26.3697171129, 7.7454360971)],
                knots=[38.2700182558, 38.2700182558, 38.2700182558, 38.2700182558, 42.2565390205, 42.2565390205, 42.2565390205, 42.2565390205], degree=3))
        make_face()
    extrude(amount=F1_DEPTH)


with BuildPart() as f1p:
    # F0 (on Top) → F1, piece 16 (new body)
    with BuildSketch(Plane.XY):
        with BuildLine():
            Line((27, 2.1762e-06), (27, -0.2623944974))
            ThreePointArc((27, -0.2623944974), (28.3851983771, 0.3388018314), (28.9552512695, 1.7371048277))
            ThreePointArc((28.9552512695, 1.7371048277), (28.3544624087, 3.1661633248), (26.9130430815, 3.7366593954))
            add(Edge.make_bspline(
                [(26.9130430815, 3.7366593954), (26.9557223388, 3.1632457962), (27.0178727185, 1.9174252072), (27.018694794, 0.6711028041), (27, 2.1762e-06)],
                knots=[46.3026951197, 46.3026951197, 46.3026951197, 46.3026951197, 48.0262708445, 50.0404462243, 50.0404462243, 50.0404462243, 50.0404462243], degree=3))
        make_face()
        with BuildLine():
            ThreePointArc((26.9130430815, 3.7366593954), (24.9557239197, 1.6936263597), (27, -0.2623944974))
            Line((27, -0.2623944974), (27, 2.1762e-06))
            add(Edge.make_bspline(
                [(26.9130430815, 3.7366593954), (26.9557223388, 3.1632457962), (27.0178727185, 1.9174252072), (27.018694794, 0.6711028041), (27, 2.1762e-06)],
                knots=[46.3026951197, 46.3026951197, 46.3026951197, 46.3026951197, 48.0262708445, 50.0404462243, 50.0404462243, 50.0404462243, 50.0404462243], degree=3))
        make_face()
    extrude(amount=F1_DEPTH)


with BuildPart() as f1q:
    # F0 (on Top) → F1, piece 17 (new body)
    with BuildSketch(Plane.XY):
        with BuildLine():
            Line((27, -4.2627700182), (27, -8.2627700182))
            ThreePointArc((27, -8.2627700182), (28.4142135624, -7.6769835806), (29, -6.2627700182))
            ThreePointArc((29, -6.2627700182), (28.4142135624, -4.8485564558), (27, -4.2627700182))
        make_face()
        with BuildLine():
            ThreePointArc((27, -4.2627700182), (25, -6.2627700182), (27, -8.2627700182))
            Line((27, -8.2627700182), (27, -4.2627700182))
        make_face()
    extrude(amount=F1_DEPTH)


with BuildPart() as f1r:
    # F0 (on Top) → F1, piece 18 (new body)
    with BuildSketch(Plane.XY):
        with BuildLine():
            ThreePointArc((27, -12.2627700182), (25, -14.2627700182), (27, -16.2627700182))
            Line((27, -16.2627700182), (27, -12.2627700182))
        make_face()
        with BuildLine():
            Line((27, -12.2627700182), (27, -16.2627700182))
            ThreePointArc((27, -16.2627700182), (28.4142135624, -15.6769835806), (29, -14.2627700182))
            ThreePointArc((29, -14.2627700182), (28.4142135624, -12.8485564558), (27, -12.2627700182))
        make_face()
    extrude(amount=F1_DEPTH)


with BuildPart() as f1s:
    # F0 (on Top) → F1, piece 19 (new body)
    with BuildSketch(Plane.XY):
        with BuildLine():
            ThreePointArc((27, -20.2627700182), (25.1266162244, -21.562460637), (25.6880517673, -23.7723367888))
            ThreePointArc((25.6880517673, -23.7723367888), (26.3547179775, -23.0310407999), (27, -22.2710574513))
            Line((27, -22.2710574513), (27, -20.2627700182))
        make_face()
        with BuildLine():
            ThreePointArc((28.2318954775, -20.6871959856), (27.6273003349, -21.4879565386), (27, -22.2710574513))
            Line((27, -22.2710574513), (27, -24.2627700182))
            ThreePointArc((27, -24.2627700182), (28.4142135624, -23.6769835806), (29, -22.2627700182))
            ThreePointArc((29, -22.2627700182), (28.7977473342, -21.3863542935), (28.2318954775, -20.6871959856))
        make_face()
        with BuildLine():
            Line((27, -20.2627700182), (27, -22.2710574513))
            ThreePointArc((27, -22.2710574513), (27.6273003349, -21.4879565386), (28.2318954775, -20.6871959856))
            ThreePointArc((28.2318954775, -20.6871959856), (27.6514798288, -20.3718511853), (27, -20.2627700182))
        make_face()
        with BuildLine():
            ThreePointArc((27, -22.2710574513), (26.3547179775, -23.0310407999), (25.6880517673, -23.7723367888))
            ThreePointArc((25.6880517673, -23.7723367888), (26.2996906188, -24.1361537938), (27, -24.2627700182))
            Line((27, -24.2627700182), (27, -22.2710574513))
        make_face()
    extrude(amount=F1_DEPTH)


solid = Compound([f1.part, f1b.part, f1c.part, f1d.part, f1e.part, f1f.part, f1g.part, f1h.part, f1i.part, f1j.part, f1k.part, f1l.part, f1m.part, f1n.part, f1o.part, f1p.part, f1q.part, f1r.part, f1s.part])
